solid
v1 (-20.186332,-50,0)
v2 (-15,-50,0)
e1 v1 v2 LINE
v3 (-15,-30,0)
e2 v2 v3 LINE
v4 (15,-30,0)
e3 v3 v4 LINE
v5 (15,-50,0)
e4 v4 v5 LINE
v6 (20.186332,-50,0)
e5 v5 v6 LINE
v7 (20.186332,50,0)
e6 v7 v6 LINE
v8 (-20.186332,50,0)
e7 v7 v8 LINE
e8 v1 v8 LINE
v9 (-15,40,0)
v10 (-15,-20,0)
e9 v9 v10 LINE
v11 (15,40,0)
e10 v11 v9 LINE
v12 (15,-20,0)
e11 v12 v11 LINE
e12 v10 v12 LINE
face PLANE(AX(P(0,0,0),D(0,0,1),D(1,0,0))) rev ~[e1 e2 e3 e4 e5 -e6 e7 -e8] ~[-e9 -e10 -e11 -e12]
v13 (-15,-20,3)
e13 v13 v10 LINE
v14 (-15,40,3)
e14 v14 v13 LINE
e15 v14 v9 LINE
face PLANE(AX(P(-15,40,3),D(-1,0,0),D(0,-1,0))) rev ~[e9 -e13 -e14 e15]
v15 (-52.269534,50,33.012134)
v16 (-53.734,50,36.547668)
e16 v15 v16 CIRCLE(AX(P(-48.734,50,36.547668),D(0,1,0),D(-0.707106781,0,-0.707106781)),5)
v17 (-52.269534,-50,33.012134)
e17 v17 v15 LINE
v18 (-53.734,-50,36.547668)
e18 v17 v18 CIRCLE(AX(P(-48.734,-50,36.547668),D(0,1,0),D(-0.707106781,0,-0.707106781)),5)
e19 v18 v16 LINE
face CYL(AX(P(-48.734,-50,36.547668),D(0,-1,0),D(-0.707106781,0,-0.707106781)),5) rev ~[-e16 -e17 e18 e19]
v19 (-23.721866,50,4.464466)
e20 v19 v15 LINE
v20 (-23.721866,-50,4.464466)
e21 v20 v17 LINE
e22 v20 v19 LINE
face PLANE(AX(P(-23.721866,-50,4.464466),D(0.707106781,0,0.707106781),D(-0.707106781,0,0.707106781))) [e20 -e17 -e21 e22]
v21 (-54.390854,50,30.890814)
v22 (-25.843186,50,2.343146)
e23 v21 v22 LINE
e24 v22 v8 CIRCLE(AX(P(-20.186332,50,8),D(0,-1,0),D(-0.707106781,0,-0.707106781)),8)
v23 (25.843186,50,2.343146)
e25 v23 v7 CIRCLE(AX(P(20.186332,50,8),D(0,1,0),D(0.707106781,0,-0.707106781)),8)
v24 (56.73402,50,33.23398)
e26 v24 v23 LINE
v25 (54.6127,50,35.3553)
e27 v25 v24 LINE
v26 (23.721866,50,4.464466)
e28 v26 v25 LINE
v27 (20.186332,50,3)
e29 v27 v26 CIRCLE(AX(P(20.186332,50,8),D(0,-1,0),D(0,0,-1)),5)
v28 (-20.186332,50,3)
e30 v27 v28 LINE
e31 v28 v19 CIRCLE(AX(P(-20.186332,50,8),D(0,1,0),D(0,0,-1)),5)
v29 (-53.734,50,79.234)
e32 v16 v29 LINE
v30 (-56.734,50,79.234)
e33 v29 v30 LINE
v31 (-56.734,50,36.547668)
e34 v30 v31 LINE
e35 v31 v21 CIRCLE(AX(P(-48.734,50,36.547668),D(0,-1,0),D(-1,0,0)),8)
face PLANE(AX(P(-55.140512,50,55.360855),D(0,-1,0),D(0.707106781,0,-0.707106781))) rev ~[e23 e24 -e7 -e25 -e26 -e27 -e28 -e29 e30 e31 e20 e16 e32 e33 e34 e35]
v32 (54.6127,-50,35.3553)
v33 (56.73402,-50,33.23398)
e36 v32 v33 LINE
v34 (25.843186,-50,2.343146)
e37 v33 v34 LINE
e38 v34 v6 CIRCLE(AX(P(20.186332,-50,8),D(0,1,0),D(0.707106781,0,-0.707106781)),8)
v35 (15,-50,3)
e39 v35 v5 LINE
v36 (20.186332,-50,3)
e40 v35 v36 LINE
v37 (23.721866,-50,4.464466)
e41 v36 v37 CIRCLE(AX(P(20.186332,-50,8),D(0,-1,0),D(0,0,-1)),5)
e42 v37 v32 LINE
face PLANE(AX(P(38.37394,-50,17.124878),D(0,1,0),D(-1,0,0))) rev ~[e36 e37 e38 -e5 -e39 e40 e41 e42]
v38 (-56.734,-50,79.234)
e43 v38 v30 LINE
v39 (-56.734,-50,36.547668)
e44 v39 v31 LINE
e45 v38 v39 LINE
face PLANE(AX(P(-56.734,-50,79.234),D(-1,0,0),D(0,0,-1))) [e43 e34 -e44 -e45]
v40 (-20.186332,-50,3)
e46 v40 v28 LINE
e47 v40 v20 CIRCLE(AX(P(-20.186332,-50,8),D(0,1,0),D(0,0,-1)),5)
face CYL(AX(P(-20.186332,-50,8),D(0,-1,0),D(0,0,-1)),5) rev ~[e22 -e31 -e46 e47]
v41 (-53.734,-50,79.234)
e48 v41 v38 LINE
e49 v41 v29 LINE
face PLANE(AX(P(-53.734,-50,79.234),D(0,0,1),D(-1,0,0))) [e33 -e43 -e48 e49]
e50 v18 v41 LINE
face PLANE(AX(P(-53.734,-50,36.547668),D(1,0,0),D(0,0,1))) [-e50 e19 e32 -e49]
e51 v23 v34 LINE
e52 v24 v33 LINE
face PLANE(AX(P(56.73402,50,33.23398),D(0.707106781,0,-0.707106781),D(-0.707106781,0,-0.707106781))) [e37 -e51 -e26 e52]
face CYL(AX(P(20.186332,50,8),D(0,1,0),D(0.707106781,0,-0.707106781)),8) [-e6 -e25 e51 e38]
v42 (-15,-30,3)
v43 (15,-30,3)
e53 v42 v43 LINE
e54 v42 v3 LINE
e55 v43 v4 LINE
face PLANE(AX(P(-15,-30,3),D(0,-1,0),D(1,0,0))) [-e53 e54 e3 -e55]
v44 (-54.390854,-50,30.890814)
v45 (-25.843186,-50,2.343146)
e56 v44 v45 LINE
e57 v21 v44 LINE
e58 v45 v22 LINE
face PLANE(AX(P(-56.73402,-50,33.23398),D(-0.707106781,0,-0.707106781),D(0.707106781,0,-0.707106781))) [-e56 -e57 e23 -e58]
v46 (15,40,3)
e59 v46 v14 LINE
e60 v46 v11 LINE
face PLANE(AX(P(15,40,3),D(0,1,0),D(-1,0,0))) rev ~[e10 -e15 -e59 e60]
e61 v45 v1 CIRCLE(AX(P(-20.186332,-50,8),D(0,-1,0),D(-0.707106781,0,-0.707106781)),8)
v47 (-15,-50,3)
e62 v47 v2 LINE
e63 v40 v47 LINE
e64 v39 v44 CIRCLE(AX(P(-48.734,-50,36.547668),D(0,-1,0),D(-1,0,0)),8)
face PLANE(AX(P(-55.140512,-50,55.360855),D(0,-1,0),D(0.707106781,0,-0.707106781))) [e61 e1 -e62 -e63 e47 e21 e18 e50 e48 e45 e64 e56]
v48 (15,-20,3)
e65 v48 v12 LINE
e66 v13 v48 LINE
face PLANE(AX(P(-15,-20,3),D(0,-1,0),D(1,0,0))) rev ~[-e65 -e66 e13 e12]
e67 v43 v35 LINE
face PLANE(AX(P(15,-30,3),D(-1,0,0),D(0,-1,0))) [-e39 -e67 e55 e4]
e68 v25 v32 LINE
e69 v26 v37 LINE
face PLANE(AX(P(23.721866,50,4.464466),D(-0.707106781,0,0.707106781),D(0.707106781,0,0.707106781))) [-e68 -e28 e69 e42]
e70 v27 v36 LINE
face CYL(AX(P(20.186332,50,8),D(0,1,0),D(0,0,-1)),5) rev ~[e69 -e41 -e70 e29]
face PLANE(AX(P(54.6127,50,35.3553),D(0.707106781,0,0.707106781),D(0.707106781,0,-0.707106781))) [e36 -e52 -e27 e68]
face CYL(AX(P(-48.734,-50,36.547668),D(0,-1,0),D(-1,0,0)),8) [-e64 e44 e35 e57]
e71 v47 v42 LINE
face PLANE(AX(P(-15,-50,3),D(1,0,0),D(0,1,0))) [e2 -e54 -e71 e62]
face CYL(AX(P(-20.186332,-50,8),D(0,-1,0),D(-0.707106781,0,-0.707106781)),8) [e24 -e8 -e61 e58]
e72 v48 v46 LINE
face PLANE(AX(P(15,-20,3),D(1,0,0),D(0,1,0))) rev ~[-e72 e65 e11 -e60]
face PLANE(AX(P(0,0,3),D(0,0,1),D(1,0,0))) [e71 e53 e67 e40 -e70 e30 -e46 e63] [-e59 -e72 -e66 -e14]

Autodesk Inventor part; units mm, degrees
ref_plane "YZ Plane" through (0, 0, 0) normal (1, 0, 0) x (0, 1, 0)
ref_plane "XZ Plane" through (0, 0, 0) normal (0, 1, 0) x (-1, 0, 0)
ref_plane "XY Plane" through (0, 0, 0) normal (0, 0, 1) x (1, 0, 0)
sketch "Sketch1" plane through (0, 0, 0) normal (0, 0, 1) x (1, 0, 0)
  line L0 (-23.5, -50) -> (23.5, -50)
  line L1 (23.5, -50) -> (23.5, 50)
  line L2 (23.5, 50) -> (-23.5, 50)
  line L3 (-23.5, 50) -> (-23.5, -50)
  line L4 (-23.5, -50) -> (23.5, 50) construction
  line L5 (23.5, -50) -> (-23.5, 50) construction
  point P0 (0, 0)
  dimension "d154" = 47
  dimension "d155" = 100
extrude "Plate3" add sketch "Sketch1" along normal blind 3
sketch "Sketch7" plane through (21.3787, 50, 2.1213) normal (0.7071068, 0, -0.7071068) x (0, 1, 0)
  line L0 (-100, 0) -> (0, 0)
  line L1 (0, 0) -> (0, 47)
  line L2 (0, 47) -> (-100, 47)
  line L3 (-100, 47) -> (-100, 0)
edge flange "Flange3" height 47 angle 45 thickness 3 bend radius 5 thickness toward (0.7071068, 0, -0.7071068) relief round relief width 3 relief depth 1.5 corner gap 5 corner form 0 edges at (23.5, 0, 3) (-23.5, 0, 3) wall of the first edge with corners at (21.3787, -50, 2.1213) (21.3787, 50, 2.1213) (54.6127, 50, 35.3553) (54.6127, -50, 35.3553)
bend "Bend3"
corner "Corner3"
sketch "Sketch8" plane through (0, 0, 3) normal (0, 0, 1) x (1, 0, 0)
  line L0 (15, 40) -> (-15, 40)
  line L1 (-15, 40) -> (-15, -20)
  line L2 (-15, -20) -> (15, -20)
  line L3 (15, -20) -> (15, 40)
  line L4 (15, 40) -> (-15, -20) construction
  line L5 (-15, 40) -> (15, -20) construction
  line L6 (-23.5, 50) -> (20.1863, 50) projected
  line L7 (-20.1863, -50) -> (20.1863, -50) projected
  line L8 (15, -50) -> (-15, -50)
  line L9 (-15, -50) -> (-15, -30)
  line L10 (-15, -30) -> (15, -30)
  line L11 (15, -30) -> (15, -50)
  point P0 (0, 0)
  point P1 (0, 10)
  point P2 (-15, -50)
  dimension "d166" = 30
  dimension "d168" = 10
  dimension "d182" = 10
  dimension "d183" = 20
extrude "Cut1" cut sketch "Sketch8" against normal blind 3
sketch "Sketch9" plane through (-53.734, -50, 33.234) normal (-1, 0, 0) x (0, -1, 0)
  line L0 (-100, 0) -> (0, 0)
  line L1 (0, 0) -> (0, 46)
  line L2 (0, 46) -> (-100, 46)
  line L3 (-100, 46) -> (-100, 0)
edge flange "Flange4" height 46 angle 45 thickness 3 bend radius 5 thickness toward (-1, 0, 0) relief round relief width 3 relief depth 1.5 edges at (-54.6127, 0, 35.3553) wall of the first edge with corners at (-53.734, 50, 33.234) (-53.734, -50, 33.234) (-53.734, -50, 79.234) (-53.734, 50, 79.234)
bend "Bend4"
corner "Corner4"
properties part number "DS-B-101 Axis" material "Stainless Steel"
